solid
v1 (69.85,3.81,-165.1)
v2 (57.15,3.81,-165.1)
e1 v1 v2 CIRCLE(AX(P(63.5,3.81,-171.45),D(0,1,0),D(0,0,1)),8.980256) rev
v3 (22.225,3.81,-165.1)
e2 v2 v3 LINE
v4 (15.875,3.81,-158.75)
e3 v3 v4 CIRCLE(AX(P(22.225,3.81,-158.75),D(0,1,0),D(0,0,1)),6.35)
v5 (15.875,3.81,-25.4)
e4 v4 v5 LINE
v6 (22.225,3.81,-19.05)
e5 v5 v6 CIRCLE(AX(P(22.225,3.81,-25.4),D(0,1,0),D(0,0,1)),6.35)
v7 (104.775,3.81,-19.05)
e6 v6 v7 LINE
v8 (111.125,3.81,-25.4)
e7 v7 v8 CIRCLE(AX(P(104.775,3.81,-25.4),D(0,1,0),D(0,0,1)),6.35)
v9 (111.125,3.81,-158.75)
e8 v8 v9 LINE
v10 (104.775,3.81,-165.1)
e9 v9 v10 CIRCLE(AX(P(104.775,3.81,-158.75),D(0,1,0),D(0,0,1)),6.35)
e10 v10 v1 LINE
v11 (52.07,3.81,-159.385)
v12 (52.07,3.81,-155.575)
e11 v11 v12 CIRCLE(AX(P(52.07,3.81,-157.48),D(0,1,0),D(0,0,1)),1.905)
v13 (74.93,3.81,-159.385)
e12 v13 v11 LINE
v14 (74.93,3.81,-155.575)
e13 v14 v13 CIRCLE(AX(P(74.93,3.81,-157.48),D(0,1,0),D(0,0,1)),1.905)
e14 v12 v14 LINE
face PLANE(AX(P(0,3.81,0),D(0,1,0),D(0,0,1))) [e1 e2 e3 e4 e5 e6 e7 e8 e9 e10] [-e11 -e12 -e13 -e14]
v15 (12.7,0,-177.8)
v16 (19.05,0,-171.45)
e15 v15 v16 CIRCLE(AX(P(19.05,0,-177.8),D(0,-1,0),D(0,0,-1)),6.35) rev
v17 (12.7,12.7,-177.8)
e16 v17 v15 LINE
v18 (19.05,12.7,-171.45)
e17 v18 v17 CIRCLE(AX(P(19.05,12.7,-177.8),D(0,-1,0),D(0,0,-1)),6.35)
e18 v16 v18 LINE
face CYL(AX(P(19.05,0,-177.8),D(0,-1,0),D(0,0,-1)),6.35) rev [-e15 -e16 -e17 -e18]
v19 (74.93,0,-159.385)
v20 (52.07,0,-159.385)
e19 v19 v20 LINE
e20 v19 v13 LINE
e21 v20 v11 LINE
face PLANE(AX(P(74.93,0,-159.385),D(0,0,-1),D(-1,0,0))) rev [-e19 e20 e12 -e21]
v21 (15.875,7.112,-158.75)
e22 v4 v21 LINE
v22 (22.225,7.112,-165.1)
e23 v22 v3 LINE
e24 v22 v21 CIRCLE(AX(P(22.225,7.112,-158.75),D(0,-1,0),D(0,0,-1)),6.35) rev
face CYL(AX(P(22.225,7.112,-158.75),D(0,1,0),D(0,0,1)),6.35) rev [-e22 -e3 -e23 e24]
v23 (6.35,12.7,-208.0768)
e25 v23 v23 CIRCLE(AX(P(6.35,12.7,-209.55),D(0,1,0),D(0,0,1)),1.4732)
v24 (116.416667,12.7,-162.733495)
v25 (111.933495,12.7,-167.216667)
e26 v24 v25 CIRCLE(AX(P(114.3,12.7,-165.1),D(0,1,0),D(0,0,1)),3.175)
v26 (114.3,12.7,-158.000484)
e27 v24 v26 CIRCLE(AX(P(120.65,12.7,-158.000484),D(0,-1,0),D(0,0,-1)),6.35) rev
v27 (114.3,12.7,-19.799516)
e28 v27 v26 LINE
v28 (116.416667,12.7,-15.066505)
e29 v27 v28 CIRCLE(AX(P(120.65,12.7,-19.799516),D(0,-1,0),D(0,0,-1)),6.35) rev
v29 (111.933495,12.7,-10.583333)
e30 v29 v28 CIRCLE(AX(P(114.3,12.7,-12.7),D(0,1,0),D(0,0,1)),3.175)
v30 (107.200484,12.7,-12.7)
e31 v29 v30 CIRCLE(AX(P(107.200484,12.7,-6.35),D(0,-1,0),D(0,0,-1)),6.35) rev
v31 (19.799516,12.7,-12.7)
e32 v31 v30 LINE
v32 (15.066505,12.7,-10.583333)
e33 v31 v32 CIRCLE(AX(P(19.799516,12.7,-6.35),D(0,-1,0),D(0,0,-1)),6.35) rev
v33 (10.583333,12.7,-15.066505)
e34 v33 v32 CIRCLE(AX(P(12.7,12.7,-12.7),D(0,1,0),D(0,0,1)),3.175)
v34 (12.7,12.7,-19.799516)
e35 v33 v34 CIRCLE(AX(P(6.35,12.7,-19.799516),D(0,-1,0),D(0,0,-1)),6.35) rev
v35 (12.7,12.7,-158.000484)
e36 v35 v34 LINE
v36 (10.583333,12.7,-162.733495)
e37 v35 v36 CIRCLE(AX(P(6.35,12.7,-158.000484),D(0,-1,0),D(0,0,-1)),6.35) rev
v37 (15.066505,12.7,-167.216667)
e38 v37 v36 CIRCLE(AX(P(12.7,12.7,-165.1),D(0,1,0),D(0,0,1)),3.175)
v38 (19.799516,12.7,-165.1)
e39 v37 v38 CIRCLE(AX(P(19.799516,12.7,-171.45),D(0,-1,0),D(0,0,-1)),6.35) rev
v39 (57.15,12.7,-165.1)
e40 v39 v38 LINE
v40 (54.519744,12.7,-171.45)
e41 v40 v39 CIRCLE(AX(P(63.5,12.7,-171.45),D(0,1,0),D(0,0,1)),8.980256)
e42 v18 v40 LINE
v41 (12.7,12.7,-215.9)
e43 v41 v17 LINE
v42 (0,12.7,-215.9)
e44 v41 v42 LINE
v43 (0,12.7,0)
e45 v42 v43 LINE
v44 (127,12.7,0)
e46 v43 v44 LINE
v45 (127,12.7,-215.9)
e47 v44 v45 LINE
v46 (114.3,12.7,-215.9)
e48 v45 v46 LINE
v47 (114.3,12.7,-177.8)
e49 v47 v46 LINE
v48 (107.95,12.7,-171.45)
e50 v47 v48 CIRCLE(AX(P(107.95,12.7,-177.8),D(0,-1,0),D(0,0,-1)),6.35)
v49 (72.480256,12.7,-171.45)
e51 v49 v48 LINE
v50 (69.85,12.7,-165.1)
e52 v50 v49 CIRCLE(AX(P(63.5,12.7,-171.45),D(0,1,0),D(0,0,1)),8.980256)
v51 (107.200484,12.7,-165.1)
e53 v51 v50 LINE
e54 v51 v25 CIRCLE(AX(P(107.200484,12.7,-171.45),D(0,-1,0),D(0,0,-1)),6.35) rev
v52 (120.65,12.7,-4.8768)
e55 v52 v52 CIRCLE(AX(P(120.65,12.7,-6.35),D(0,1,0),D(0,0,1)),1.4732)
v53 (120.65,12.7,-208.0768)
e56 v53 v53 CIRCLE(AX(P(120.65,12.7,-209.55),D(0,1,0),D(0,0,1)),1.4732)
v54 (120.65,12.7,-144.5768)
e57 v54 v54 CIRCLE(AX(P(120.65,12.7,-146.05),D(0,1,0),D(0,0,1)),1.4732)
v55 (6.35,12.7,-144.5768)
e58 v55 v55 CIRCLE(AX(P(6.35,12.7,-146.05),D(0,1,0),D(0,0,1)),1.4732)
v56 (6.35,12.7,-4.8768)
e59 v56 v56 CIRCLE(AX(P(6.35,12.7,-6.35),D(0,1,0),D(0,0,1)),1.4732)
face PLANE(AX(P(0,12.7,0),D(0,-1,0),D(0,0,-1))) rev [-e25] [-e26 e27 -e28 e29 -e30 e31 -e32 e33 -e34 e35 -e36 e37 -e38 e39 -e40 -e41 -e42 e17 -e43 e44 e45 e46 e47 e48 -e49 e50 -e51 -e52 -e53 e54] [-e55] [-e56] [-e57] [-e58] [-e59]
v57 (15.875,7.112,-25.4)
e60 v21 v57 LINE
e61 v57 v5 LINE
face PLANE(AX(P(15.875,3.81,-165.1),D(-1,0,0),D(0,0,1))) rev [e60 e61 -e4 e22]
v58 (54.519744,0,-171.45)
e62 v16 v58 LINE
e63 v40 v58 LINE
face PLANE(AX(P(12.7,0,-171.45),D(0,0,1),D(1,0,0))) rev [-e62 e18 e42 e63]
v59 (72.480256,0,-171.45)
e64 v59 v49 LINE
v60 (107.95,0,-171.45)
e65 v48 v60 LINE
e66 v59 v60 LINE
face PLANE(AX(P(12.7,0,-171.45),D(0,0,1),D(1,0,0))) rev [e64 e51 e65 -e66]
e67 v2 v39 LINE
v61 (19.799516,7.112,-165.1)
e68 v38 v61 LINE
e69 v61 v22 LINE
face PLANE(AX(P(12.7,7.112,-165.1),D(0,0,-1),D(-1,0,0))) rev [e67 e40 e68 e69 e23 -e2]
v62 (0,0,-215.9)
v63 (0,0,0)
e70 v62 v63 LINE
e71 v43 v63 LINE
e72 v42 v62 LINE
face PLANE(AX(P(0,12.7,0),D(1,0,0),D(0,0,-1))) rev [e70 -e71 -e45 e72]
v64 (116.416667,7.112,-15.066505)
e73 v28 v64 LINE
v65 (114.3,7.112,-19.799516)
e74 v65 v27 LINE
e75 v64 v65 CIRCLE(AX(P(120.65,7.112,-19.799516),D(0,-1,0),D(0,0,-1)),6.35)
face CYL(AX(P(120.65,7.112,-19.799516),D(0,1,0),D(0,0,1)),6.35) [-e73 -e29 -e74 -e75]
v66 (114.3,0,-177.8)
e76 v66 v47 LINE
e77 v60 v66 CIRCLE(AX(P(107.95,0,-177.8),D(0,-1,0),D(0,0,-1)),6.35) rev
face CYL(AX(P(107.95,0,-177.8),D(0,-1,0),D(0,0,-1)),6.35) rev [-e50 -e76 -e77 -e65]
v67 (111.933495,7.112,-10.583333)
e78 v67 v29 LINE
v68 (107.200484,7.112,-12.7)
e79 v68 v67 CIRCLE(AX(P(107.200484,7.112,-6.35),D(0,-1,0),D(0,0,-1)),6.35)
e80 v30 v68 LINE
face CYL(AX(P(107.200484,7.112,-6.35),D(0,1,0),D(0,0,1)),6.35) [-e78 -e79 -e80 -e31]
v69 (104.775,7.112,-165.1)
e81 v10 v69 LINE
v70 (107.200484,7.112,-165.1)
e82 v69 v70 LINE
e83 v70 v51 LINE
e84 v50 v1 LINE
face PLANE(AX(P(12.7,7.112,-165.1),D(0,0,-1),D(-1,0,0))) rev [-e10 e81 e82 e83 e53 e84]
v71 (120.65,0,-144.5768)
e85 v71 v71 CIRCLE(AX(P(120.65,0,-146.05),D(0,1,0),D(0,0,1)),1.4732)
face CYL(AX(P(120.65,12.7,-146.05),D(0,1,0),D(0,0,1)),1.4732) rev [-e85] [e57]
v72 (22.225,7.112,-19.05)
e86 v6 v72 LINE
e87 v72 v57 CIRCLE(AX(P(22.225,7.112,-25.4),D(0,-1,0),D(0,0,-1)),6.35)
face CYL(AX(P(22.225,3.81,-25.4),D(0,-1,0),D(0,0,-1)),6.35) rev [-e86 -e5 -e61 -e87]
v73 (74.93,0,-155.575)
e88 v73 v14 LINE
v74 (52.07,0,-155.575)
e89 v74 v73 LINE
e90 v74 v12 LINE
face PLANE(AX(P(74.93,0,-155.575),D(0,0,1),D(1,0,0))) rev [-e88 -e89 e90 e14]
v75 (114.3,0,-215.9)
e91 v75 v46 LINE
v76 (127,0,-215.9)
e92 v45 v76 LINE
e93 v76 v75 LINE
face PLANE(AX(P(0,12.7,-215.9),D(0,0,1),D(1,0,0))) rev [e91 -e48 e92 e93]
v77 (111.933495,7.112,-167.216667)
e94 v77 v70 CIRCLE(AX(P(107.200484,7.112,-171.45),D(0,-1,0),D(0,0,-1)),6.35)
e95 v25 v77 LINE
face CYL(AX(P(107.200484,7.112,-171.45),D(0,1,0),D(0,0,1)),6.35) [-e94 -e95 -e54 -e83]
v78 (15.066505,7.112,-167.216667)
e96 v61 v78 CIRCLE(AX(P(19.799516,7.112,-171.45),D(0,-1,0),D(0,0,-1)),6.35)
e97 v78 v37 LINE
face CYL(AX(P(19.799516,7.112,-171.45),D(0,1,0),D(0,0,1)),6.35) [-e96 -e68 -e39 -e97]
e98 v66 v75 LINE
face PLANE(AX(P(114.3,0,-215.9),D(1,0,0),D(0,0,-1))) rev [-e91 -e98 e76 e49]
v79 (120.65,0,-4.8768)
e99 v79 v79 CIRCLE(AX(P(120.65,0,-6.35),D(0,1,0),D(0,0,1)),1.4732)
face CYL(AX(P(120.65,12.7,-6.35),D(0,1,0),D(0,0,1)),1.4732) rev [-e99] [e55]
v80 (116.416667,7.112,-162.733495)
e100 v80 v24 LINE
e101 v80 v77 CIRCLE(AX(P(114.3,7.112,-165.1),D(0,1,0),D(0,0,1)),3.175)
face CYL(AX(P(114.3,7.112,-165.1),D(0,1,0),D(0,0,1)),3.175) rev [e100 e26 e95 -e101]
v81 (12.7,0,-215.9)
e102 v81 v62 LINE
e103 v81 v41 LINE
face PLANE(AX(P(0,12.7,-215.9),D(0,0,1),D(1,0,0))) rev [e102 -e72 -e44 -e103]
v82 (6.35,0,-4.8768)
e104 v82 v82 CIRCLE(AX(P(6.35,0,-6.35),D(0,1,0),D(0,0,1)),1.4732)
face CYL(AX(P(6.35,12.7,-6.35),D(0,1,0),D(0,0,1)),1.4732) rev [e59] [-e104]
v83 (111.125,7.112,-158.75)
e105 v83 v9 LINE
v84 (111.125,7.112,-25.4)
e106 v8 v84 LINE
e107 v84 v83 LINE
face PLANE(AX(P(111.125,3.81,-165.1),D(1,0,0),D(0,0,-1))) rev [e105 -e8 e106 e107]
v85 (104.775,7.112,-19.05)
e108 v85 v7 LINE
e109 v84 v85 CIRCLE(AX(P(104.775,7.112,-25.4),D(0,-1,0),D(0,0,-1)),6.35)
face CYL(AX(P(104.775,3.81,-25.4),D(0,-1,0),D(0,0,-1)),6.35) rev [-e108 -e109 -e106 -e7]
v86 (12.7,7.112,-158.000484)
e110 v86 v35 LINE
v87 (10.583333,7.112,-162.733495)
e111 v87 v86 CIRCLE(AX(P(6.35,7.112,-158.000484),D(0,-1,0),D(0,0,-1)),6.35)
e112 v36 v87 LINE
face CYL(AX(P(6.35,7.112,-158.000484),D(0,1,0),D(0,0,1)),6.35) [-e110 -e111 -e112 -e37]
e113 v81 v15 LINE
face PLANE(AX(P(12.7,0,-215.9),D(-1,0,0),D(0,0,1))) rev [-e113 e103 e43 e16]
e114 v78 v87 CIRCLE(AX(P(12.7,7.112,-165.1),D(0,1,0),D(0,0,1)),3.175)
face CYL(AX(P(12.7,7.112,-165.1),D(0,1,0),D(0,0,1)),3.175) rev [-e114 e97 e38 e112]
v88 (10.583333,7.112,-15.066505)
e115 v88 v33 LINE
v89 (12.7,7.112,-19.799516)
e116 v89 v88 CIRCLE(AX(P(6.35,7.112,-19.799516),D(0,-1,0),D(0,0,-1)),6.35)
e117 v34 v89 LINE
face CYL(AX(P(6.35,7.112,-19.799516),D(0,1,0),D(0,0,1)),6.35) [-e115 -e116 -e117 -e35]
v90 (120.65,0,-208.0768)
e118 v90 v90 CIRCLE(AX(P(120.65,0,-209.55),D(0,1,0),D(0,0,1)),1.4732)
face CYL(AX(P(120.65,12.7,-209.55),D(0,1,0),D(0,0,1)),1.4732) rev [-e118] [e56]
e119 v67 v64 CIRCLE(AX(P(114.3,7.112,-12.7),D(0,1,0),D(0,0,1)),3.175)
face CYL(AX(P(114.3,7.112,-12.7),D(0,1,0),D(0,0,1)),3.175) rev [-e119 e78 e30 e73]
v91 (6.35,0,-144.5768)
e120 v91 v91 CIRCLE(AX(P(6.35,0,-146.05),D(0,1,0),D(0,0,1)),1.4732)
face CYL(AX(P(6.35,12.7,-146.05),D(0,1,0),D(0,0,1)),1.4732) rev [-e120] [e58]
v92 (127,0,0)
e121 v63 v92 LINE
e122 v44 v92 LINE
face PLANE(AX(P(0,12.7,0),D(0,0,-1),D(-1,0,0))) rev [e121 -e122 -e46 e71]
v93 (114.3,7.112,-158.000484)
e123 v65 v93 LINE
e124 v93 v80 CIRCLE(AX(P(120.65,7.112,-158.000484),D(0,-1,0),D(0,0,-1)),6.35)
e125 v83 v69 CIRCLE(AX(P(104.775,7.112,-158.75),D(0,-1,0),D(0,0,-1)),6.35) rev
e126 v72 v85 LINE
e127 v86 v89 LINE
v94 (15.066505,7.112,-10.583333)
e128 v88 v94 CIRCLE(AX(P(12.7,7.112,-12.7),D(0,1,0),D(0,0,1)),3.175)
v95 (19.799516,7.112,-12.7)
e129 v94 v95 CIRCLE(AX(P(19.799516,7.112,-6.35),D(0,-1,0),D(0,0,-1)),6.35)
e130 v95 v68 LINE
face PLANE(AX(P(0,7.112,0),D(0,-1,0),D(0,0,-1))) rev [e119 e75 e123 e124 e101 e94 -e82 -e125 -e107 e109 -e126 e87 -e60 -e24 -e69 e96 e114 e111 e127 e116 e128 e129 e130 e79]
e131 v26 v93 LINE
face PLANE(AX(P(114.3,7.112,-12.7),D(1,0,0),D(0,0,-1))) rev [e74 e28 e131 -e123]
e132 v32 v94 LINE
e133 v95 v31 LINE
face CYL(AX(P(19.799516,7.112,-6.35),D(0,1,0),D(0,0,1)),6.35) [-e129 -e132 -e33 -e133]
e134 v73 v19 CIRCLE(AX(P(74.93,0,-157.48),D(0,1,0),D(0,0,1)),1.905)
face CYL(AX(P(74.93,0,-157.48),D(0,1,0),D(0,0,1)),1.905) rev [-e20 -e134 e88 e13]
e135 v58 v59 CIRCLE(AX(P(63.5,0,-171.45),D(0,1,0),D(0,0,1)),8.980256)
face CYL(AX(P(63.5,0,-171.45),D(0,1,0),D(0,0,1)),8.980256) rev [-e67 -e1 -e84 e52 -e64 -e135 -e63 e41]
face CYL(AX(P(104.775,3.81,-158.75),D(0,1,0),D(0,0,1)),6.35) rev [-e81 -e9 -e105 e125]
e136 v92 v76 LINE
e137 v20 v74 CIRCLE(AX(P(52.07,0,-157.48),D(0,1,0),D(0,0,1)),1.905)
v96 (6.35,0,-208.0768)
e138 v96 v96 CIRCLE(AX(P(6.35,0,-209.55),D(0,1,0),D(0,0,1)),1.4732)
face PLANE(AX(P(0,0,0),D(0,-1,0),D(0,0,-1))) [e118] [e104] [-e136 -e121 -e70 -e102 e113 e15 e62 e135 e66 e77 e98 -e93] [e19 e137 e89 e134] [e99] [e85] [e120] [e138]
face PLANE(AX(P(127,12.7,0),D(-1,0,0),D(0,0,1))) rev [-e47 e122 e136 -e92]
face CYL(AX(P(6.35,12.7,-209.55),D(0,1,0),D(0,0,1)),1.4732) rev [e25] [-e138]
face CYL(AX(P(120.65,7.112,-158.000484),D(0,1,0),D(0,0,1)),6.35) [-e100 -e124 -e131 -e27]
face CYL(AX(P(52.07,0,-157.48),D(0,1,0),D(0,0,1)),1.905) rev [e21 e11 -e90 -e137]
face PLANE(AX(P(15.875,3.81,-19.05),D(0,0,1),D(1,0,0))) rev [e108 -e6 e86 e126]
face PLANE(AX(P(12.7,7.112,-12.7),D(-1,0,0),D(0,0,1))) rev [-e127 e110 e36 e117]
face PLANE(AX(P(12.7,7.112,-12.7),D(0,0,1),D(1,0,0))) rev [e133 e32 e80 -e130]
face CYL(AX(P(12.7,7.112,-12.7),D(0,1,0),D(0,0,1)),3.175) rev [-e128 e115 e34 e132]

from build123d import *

# Parameters (mm, degrees)
SKETCH2_W                   = 127
SKETCH2_H                   = 215.9
BOSS_EXTRUDE1_DEPTH         = 12.7
SKETCH5_W                   = 101.6
SKETCH5_H                   = 152.4
CUT_EXTRUDE3_DEPTH          = 5.588
SKETCH6_W                   = 101.6
SKETCH6_H                   = 44.45
CUT_EXTRUDE4_DEPTH          = 251.804904258
SKETCH8_R                   = 8.980256121
CUT_EXTRUDE6_DEPTH          = 251.804904258
SKETCH9_W                   = 95.25
SKETCH9_H                   = 146.05
CUT_EXTRUDE7_DEPTH          = 3.302
CUT_EXTRUDE8_DEPTH          = 3.81
F_32_0_116_DIAMETER_HOLE1_D = 2.9464
SKETCH18_R                  = 3.175
CUT_EXTRUDE9_DEPTH          = 5.588
FILLET5_R                   = 6.35
FILLET7_R                   = 6.35
FILLET8_R                   = 6.35
FILLET10_R                  = 6.35
FILLET11_R                  = 6.35


with BuildPart() as part:
    # Sketch2 → Boss-Extrude1 (new body)
    with BuildSketch(Plane(origin=(0, 0, 0), x_dir=(1, 0, 0), z_dir=(0, 1, 0))):
        with Locations((63.5, 107.95)):
            Rectangle(SKETCH2_W, SKETCH2_H)
    extrude(amount=BOSS_EXTRUDE1_DEPTH)

    # Sketch5 → Cut-Extrude3 (cut)
    with BuildSketch(Plane(origin=(0, 12.7, 0), x_dir=(1, 0, 0), z_dir=(0, 1, 0))):
        with Locations((63.5, 88.9)):
            Rectangle(SKETCH5_W, SKETCH5_H)
    extrude(amount=-CUT_EXTRUDE3_DEPTH, mode=Mode.SUBTRACT)

    # Sketch6 → Cut-Extrude4 (cut, through all)
    with BuildSketch(Plane(origin=(0, 12.7, 0), x_dir=(1, 0, 0), z_dir=(0, 1, 0))):
        with Locations((63.5, 193.675)):
            Rectangle(SKETCH6_W, SKETCH6_H)
    extrude(amount=-CUT_EXTRUDE4_DEPTH, mode=Mode.SUBTRACT)

    # Sketch8 → Cut-Extrude6 (cut, through all)
    with BuildSketch(Plane(origin=(0, 12.7, 0), x_dir=(1, 0, 0), z_dir=(0, 1, 0))):
        with Locations((63.5, 171.45)):
            Circle(SKETCH8_R)
    extrude(amount=-CUT_EXTRUDE6_DEPTH, mode=Mode.SUBTRACT)

    # Sketch9 → Cut-Extrude7 (cut)
    with BuildSketch(Plane(origin=(0, 7.112, 0), x_dir=(1, 0, 0), z_dir=(0, 1, 0))):
        with Locations((63.5, 92.075)):
            Rectangle(SKETCH9_W, SKETCH9_H)
    extrude(amount=-CUT_EXTRUDE7_DEPTH, mode=Mode.SUBTRACT)

    # Sketch11 → Cut-Extrude8 (cut)
    with BuildSketch(Plane(origin=(0, 3.81, 0), x_dir=(1, 0, 0), z_dir=(0, 1, 0))):
        with BuildLine():
            Line((74.93, 155.575), (52.07, 155.575))
            ThreePointArc((52.07, 155.575), (50.165, 157.48), (52.07, 159.385))
            Line((52.07, 159.385), (74.93, 159.385))
            ThreePointArc((74.93, 159.385), (76.835, 157.48), (74.93, 155.575))
        make_face()
    extrude(amount=-CUT_EXTRUDE8_DEPTH, mode=Mode.SUBTRACT)

    # #32 (0.116) Diameter Hole1 (through all)
    with Locations(Plane(origin=(0, 12.7, 0), x_dir=(1, 0, 0), z_dir=(0, 1, 0))):
        with Locations((6.35, 209.55), (120.65, 209.55), (120.65, 6.35), (6.35, 6.35), (6.35, 146.05), (120.65, 146.05)):
            Hole(F_32_0_116_DIAMETER_HOLE1_D / 2)

    # Sketch18 → Cut-Extrude9 (cut)
    with BuildSketch(Plane(origin=(0, 12.7, 0), x_dir=(1, 0, 0), z_dir=(0, 1, 0))):
        with Locations((12.7, 165.1)):
            Circle(SKETCH18_R)
        with Locations((114.3, 165.1)):
            Circle(SKETCH18_R)
        with Locations((114.3, 12.7)):
            Circle(SKETCH18_R)
        with Locations((12.7, 12.7)):
            Circle(SKETCH18_R)
    extrude(amount=-CUT_EXTRUDE9_DEPTH, mode=Mode.SUBTRACT)

    # Fillet5
    fillet5_edges = [part.edges().sort_by_distance(p)[0] for p in [
        (12.7, 9.906, -15.875),
        (15.875, 9.906, -12.7),
        (114.3, 9.906, -15.875),
        (111.125, 9.906, -12.7),
        (111.125, 9.906, -165.1),
        (114.3, 9.906, -161.925),
        (15.875, 9.906, -165.1),
        (12.7, 9.906, -161.925),
    ]]
    fillet(fillet5_edges, radius=FILLET5_R)

    # Fillet7
    fillet7_edges = [part.edges().sort_by_distance(p)[0] for p in [
        (12.7, 6.35, -171.45),
        (114.3, 6.35, -171.45),
    ]]
    fillet(fillet7_edges, radius=FILLET7_R)

    # Fillet8
    fillet8_edges = [part.edges().sort_by_distance(p)[0] for p in [
        (15.875, 5.461, -19.05),
        (111.125, 5.461, -19.05),
    ]]
    fillet(fillet8_edges, radius=FILLET8_R)

    # Fillet10
    # the kernel refuses this fillet: 6.35 mm, written as the material it adds along each edge
    with BuildSketch(Plane(origin=(111.125, 7.112, -165.1), x_dir=(-1, 0, 0), z_dir=(0, -1, 0))) as fillet10_piece_1:
        with BuildLine():
            CenterArc((FILLET10_R, -FILLET10_R), FILLET10_R, 90, 90)
            Line((0, -FILLET10_R), (0, 0))
            Line((0, 0), (FILLET10_R, 0))
        make_face()
    extrude(amount=3.302)

    # Fillet11
    # the kernel refuses this fillet: 6.35 mm, written as the material it adds along each edge
    with BuildSketch(Plane(origin=(15.875, 7.112, -165.1), x_dir=(1, 0, 0), z_dir=(0, -1, 0))) as fillet11_piece_1:
        with BuildLine():
            CenterArc((FILLET11_R, FILLET11_R), FILLET11_R, 180, 90)
            Line((0, FILLET11_R), (0, 0))
            Line((0, 0), (FILLET11_R, 0))
        make_face()
    extrude(amount=3.302)


solid = part.part
